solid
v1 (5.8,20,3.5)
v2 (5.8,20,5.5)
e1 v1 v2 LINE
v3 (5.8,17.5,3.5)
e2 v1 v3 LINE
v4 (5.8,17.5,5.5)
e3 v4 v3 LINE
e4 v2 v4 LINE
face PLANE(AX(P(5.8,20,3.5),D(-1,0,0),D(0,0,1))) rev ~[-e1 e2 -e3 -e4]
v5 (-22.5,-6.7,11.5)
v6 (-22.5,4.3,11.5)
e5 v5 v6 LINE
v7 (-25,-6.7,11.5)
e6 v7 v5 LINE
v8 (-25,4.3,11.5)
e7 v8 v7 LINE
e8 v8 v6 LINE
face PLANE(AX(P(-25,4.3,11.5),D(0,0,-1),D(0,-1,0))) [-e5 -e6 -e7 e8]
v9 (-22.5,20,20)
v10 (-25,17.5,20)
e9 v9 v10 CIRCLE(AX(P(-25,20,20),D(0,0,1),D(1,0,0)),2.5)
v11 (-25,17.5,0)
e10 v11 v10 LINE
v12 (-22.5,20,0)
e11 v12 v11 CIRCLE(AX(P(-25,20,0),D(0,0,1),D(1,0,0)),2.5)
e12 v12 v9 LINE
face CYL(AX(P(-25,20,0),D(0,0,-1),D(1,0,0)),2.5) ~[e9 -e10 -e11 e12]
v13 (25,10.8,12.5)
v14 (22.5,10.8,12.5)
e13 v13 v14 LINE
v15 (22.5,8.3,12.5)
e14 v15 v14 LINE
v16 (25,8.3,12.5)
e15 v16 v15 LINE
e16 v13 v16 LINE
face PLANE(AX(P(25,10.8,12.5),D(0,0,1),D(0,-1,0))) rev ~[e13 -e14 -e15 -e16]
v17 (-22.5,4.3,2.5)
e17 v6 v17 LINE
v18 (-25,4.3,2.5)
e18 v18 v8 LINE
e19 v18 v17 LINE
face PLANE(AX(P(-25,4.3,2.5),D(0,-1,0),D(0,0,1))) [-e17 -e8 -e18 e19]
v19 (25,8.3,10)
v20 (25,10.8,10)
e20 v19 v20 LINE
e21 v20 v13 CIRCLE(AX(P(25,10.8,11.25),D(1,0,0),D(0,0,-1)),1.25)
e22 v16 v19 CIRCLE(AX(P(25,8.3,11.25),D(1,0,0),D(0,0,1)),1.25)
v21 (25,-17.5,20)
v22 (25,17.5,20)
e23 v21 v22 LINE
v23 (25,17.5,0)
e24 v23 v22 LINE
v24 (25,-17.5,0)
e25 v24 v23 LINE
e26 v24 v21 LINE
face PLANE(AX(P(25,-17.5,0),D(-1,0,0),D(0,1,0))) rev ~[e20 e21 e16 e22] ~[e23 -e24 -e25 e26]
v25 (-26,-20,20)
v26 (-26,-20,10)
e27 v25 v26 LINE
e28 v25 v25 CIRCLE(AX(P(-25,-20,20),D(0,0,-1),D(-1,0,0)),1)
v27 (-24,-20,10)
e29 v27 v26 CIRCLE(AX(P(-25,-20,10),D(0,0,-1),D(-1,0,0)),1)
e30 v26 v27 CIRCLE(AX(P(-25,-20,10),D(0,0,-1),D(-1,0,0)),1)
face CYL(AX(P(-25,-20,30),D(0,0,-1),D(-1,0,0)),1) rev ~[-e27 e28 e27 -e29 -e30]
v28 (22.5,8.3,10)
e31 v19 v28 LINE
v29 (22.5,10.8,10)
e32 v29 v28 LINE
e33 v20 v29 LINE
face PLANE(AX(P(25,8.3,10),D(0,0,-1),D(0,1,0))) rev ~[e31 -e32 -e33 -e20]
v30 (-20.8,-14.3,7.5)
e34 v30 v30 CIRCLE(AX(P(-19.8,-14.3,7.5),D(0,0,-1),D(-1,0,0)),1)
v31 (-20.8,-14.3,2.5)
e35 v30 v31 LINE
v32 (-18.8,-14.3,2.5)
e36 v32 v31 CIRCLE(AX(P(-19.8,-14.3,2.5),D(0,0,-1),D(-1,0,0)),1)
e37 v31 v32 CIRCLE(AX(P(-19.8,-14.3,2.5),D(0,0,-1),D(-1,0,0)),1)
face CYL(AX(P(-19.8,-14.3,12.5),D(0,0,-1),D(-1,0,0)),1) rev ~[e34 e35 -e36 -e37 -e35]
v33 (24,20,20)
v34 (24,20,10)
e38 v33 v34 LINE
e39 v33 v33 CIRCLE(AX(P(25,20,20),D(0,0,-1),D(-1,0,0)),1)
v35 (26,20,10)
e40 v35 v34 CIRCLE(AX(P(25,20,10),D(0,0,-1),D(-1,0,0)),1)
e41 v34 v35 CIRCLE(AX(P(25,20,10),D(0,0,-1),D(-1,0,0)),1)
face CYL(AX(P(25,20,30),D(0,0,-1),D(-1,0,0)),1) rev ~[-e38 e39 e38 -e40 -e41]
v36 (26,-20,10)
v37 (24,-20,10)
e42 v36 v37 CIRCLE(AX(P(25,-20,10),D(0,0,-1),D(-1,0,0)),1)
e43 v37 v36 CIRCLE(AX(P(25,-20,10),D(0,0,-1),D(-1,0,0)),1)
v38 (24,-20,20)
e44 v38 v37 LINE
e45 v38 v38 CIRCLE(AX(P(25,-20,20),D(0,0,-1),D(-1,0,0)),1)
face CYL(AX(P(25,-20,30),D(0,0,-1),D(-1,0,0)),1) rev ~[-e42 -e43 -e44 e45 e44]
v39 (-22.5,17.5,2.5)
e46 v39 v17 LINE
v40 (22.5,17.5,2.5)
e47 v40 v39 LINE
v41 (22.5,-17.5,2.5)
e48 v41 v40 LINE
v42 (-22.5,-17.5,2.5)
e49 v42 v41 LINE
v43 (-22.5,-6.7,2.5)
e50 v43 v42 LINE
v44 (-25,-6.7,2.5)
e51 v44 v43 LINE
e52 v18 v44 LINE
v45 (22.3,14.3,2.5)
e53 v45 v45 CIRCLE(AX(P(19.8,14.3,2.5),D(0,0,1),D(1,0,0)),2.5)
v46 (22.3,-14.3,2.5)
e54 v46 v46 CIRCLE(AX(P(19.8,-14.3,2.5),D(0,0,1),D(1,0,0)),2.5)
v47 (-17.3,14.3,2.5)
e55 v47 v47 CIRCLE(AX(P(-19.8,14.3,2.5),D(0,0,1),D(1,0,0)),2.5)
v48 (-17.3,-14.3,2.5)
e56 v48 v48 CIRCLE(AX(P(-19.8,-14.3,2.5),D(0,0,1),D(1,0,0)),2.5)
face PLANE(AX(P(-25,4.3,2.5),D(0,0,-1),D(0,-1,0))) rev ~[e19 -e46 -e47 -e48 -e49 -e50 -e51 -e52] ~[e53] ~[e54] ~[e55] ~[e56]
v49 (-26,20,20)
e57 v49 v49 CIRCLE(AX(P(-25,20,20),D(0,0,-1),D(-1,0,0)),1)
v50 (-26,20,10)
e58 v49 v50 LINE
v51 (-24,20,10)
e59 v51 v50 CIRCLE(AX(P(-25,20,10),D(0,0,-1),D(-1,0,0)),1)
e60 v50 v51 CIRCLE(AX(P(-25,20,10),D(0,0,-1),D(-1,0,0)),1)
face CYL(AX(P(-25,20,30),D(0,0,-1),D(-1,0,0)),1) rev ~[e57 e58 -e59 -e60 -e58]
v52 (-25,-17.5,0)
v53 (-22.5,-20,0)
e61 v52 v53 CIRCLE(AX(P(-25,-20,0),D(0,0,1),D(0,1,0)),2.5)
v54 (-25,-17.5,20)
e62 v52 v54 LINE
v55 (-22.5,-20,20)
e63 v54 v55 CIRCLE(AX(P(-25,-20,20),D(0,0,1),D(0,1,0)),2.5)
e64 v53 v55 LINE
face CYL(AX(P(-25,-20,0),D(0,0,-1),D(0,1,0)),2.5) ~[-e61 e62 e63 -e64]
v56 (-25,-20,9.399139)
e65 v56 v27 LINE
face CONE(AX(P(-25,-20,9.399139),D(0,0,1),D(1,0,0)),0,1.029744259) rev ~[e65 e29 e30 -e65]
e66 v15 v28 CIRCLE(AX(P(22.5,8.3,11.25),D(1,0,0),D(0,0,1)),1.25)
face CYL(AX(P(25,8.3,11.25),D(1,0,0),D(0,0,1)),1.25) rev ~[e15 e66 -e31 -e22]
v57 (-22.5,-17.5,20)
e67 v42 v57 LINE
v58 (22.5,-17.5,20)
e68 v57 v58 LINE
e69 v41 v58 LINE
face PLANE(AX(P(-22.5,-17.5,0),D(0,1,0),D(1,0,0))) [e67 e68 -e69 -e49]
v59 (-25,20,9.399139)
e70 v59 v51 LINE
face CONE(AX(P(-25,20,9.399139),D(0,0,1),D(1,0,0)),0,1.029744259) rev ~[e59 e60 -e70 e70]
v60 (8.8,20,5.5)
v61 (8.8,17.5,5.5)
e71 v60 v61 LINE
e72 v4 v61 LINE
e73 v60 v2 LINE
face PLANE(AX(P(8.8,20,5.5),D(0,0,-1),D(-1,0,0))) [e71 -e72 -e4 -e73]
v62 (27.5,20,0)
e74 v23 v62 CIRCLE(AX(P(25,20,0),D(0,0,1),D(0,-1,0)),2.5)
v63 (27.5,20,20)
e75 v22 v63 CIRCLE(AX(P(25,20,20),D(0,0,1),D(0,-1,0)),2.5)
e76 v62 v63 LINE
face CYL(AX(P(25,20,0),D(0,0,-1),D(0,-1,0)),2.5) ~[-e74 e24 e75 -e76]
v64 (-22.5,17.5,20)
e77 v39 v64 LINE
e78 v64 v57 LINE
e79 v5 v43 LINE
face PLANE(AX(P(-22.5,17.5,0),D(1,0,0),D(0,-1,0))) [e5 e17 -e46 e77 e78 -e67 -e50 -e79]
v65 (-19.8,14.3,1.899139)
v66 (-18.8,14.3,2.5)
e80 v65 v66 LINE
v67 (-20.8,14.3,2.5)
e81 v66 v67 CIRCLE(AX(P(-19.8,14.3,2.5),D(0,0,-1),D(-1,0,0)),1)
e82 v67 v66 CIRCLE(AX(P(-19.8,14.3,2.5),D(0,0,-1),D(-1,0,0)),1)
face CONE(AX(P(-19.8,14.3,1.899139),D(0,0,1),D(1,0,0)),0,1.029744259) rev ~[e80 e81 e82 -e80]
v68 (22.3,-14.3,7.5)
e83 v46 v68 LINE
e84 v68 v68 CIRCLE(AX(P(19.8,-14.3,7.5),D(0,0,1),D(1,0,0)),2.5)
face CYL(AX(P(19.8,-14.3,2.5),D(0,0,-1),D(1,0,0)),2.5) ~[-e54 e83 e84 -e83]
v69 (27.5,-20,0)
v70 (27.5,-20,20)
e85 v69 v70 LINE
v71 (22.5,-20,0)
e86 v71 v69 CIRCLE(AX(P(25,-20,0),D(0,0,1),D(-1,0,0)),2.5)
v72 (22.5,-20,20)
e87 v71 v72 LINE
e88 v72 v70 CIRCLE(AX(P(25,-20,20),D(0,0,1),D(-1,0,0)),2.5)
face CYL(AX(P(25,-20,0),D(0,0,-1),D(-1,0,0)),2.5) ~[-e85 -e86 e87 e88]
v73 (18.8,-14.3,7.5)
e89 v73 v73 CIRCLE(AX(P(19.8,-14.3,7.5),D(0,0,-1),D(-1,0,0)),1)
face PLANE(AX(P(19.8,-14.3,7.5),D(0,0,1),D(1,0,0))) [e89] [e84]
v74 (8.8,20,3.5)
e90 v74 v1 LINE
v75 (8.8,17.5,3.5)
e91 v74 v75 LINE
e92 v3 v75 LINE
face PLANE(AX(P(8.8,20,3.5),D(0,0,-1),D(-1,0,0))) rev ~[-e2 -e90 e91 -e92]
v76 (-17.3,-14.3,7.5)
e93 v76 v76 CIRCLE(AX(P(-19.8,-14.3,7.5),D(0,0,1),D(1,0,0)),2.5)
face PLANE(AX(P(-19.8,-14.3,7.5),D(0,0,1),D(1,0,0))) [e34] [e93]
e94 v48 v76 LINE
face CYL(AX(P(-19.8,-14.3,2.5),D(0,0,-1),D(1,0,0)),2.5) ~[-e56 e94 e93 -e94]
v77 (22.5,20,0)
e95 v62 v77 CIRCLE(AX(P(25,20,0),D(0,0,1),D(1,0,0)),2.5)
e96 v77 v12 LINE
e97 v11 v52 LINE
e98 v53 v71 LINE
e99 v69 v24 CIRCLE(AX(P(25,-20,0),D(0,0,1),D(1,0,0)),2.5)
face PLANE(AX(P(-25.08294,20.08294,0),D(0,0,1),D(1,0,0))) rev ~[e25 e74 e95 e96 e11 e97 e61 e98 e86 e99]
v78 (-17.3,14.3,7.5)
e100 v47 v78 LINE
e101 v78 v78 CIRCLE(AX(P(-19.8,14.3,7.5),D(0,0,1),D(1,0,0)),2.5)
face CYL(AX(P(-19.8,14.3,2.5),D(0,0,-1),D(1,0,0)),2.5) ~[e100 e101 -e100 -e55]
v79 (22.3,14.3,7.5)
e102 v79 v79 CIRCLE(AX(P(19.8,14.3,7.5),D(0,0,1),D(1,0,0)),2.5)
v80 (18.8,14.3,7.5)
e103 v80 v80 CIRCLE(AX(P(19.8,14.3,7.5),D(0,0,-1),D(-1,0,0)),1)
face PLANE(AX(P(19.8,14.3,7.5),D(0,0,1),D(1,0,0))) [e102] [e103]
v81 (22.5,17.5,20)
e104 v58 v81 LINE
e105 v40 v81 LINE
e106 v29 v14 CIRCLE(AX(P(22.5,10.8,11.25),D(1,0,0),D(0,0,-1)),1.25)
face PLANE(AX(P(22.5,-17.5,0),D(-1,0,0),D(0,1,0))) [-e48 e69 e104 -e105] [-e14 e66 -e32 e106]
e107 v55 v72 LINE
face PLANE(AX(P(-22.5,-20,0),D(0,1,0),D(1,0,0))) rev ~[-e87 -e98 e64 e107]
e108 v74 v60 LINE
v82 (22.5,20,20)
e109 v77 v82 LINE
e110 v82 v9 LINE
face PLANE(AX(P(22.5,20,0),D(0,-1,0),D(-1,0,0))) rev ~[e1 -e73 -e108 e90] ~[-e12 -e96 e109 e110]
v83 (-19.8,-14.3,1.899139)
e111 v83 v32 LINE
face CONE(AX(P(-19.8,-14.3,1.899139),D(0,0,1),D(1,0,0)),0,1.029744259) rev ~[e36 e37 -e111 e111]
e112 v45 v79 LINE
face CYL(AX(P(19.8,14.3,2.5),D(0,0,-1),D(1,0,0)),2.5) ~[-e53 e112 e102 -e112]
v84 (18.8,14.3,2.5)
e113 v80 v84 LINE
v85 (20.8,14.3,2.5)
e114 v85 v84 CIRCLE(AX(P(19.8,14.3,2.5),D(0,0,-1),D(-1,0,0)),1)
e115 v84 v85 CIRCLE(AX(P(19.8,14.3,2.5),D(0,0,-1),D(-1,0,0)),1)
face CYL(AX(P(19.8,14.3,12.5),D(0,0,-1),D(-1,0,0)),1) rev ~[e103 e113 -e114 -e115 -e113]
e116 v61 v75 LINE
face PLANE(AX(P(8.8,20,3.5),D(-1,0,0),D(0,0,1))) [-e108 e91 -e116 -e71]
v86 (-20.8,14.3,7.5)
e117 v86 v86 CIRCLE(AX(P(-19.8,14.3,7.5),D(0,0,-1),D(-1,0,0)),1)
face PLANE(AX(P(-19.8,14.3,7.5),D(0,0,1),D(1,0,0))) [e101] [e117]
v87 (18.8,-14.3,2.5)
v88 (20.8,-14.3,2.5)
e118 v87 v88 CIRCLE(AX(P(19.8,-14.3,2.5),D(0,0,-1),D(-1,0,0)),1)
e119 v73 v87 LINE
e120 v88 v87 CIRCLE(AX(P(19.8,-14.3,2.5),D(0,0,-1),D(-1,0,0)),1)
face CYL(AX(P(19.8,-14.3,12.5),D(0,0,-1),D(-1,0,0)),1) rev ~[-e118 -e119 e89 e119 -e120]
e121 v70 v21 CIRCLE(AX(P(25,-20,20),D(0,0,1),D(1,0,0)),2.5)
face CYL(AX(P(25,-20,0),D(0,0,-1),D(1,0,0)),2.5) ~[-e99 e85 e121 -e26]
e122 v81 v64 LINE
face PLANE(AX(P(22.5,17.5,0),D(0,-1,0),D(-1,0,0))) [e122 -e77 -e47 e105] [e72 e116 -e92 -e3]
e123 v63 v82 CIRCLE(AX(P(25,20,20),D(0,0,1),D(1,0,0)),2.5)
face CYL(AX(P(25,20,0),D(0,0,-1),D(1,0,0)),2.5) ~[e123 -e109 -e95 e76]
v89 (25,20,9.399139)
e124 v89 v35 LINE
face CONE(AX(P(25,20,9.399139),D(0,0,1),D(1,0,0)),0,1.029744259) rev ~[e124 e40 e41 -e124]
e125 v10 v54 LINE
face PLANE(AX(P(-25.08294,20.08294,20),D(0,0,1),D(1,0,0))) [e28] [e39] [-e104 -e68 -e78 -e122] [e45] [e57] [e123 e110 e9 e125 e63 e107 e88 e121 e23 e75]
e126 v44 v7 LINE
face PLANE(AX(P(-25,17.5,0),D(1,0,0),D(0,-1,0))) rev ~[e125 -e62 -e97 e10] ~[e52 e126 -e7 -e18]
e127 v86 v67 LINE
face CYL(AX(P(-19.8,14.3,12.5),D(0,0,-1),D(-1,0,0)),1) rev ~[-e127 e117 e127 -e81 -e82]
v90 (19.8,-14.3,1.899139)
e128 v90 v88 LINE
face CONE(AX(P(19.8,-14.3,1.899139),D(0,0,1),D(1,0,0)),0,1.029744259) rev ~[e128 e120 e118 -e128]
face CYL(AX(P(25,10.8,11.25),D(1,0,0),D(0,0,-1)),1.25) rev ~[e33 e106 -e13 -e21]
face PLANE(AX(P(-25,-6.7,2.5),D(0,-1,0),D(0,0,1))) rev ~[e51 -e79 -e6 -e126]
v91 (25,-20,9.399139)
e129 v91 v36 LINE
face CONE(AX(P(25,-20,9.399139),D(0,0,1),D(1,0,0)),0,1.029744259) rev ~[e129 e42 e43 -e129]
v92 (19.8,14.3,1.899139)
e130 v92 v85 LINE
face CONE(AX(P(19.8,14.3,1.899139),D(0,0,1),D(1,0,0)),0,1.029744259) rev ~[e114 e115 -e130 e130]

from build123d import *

# Parameters (mm, degrees)
F1_DEPTH        = 20
F2_T            = 2.5
F2_T3_DEPTH     = 25
F3_R            = 2.5
F4_DEPTH        = 5
F11_W           = 3
F11_H           = 2
F12_DEPTH       = 5
F13_DEPTH       = 5
F14_W           = 11
F14_H           = 9
F15_DEPTH       = 5
F16_D           = 2
F16_DEPTH       = 10
F16_TIP         = 0.600860619
F17_D           = 2
F17_DEPTH       = 5
F17_TIP         = 0.600860619
F17_ON_F7_D     = 2
F17_ON_F7_DEPTH = 5
F17_ON_F7_TIP   = 0.600860619
F17_ON_F6_D     = 2
F17_ON_F6_DEPTH = 5
F17_ON_F6_TIP   = 0.600860619
F17_ON_F8_D     = 2
F17_ON_F8_DEPTH = 5
F17_ON_F8_TIP   = 0.600860619


# Not quite as in the source:
# - a shell that OpenCascade refuses in one call is made with other operations: the cavity is built on its own and cut out


with BuildPart() as f1:
    # F0 (on Top) → F1 (new body)
    with BuildSketch(Plane.XY):
        with BuildLine():
            Line((-25, 17.5), (-25, 20))
            Line((-25, 20), (-22.5, 20))
            ThreePointArc((-22.5, 20), (-26.767766953, 21.767766953), (-25, 17.5))
        make_face()
        with BuildLine():
            Line((-22.5, 20), (-25, 20))
            Line((-25, 20), (-25, 17.5))
            ThreePointArc((-25, 17.5), (-23.232233047, 18.232233047), (-22.5, 20))
        make_face()
        with BuildLine():
            Line((22.5, 20), (-22.5, 20))
            ThreePointArc((-22.5, 20), (-23.232233047, 18.232233047), (-25, 17.5))
            Line((-25, 17.5), (-25, -17.5))
            ThreePointArc((-25, -17.5), (-23.232233047, -18.232233047), (-22.5, -20))
            Line((-22.5, -20), (22.5, -20))
            ThreePointArc((22.5, -20), (23.232233047, -18.232233047), (25, -17.5))
            Line((25, -17.5), (25, 17.5))
            ThreePointArc((25, 17.5), (23.232233047, 18.232233047), (22.5, 20))
        make_face()
        with BuildLine():
            ThreePointArc((27.5, 20), (25, 22.5), (22.5, 20))
            Line((22.5, 20), (25, 20))
            Line((25, 20), (25, 17.5))
            ThreePointArc((25, 17.5), (26.767766953, 18.232233047), (27.5, 20))
        make_face()
        with BuildLine():
            Line((25, 20), (22.5, 20))
            ThreePointArc((22.5, 20), (23.232233047, 18.232233047), (25, 17.5))
            Line((25, 17.5), (25, 20))
        make_face()
        with BuildLine():
            ThreePointArc((-22.5, -20), (-23.232233047, -18.232233047), (-25, -17.5))
            Line((-25, -17.5), (-25, -20))
            Line((-25, -20), (-22.5, -20))
        make_face()
        with BuildLine():
            Line((-25, -20), (-25, -17.5))
            ThreePointArc((-25, -17.5), (-26.767766953, -21.767766953), (-22.5, -20))
            Line((-22.5, -20), (-25, -20))
        make_face()
        with BuildLine():
            ThreePointArc((27.5, -20), (26.767766953, -18.232233047), (25, -17.5))
            Line((25, -17.5), (25, -20))
            Line((25, -20), (22.5, -20))
            ThreePointArc((22.5, -20), (25, -22.5), (27.5, -20))
        make_face()
        with BuildLine():
            Line((25, -20), (25, -17.5))
            ThreePointArc((25, -17.5), (23.232233047, -18.232233047), (22.5, -20))
            Line((22.5, -20), (25, -20))
        make_face()
    extrude(amount=F1_DEPTH)

    # F2: shell of thickness 2.5, made by hand


with BuildPart() as f2_core1:
    # F2_t2: copy of F1
    add(f1.part)

    # the walls: a layer under each face that stays
    f2_faces = [f2_core1.faces().sort_by_distance(p)[0] for p in [
        (-25, 0, 10),
        (0, -20, 10),
        (25, 0, 10),
        (0, 20, 10),
        (0, 0, 0),
    ]]
    thicken(f2_faces, amount=-F2_T, mode=Mode.SUBTRACT)

    # F2_s4 → F2_t3 (cut)
    with BuildSketch(Plane.XY.offset(-2.5)):
        Polygon((-22.475, 20.025), (-25, 20), (-25, 17.5), (-22.5, 17.5), align=None)
        Polygon((-25.025, 17.475), (-25, 20), (-22.5, 20), (-22.5, 17.5), align=None)
        Polygon((-25.025, -17.475), (-22.5, -17.5), (-22.5, -20), (-25, -20), align=None)
        Polygon((-22.475, -20.025), (-25, -20), (-25, -17.5), (-22.5, -17.5), align=None)
        Polygon((22.475, -20.025), (22.5, -17.5), (25, -17.5), (25, -20), align=None)
        Polygon((25.025, -17.475), (25, -20), (22.5, -20), (22.5, -17.5), align=None)
        Polygon((25.025, 17.475), (22.5, 17.5), (22.5, 20), (25, 20), align=None)
        Polygon((22.475, 20.025), (25, 20), (25, 17.5), (22.5, 17.5), align=None)
    extrude(amount=F2_T3_DEPTH, mode=Mode.SUBTRACT)


with BuildPart() as f1_1:
    add(f1.part)

    # what is left inside the walls is the cavity
    f2_cavity = [f2_core1.part.solids().sort_by_distance(p)[0] for p in [
        (0, -5.833333, 2.525),
    ]]
    add(f2_cavity, mode=Mode.SUBTRACT)

    # F3 (on face) → F4 (join)
    with BuildSketch(Plane.XY.offset(2.5)):
        with Locations((-19.8, 14.3)):
            Circle(F3_R)
        with Locations((19.8, 14.3)):
            Circle(F3_R)
        with Locations((-19.8, -14.3)):
            Circle(F3_R)
        with Locations((19.8, -14.3)):
            Circle(F3_R)
    extrude(amount=F4_DEPTH)

    # F11 (on face) → F12 (cut)
    with BuildSketch(Plane(origin=(0, 20, 0), x_dir=(-1, 0, 0), z_dir=(0, 1, 0))):
        with Locations((-7.3, 4.5)):
            Rectangle(F11_W, F11_H)
    extrude(amount=-F12_DEPTH, mode=Mode.SUBTRACT)

    # F10 (on face) → F13 (cut)
    with BuildSketch(Plane.YZ.offset(25)):
        with BuildLine():
            Line((10.8, 12.5), (8.3, 12.5))
            ThreePointArc((8.3, 12.5), (7.05, 11.25), (8.3, 10))
            Line((8.3, 10), (10.8, 10))
            ThreePointArc((10.8, 10), (12.05, 11.25), (10.8, 12.5))
        make_face()
    extrude(amount=-F13_DEPTH, mode=Mode.SUBTRACT)

    # F14 (on face) → F15 (cut)
    with BuildSketch(Plane(origin=(-25, 0, 0), x_dir=(0, -1, 0), z_dir=(-1, 0, 0))):
        with Locations((1.2, 7)):
            Rectangle(F14_W, F14_H)
    extrude(amount=-F15_DEPTH, mode=Mode.SUBTRACT)

    # F16
    with Locations(Plane.XY.offset(20)):
        with Locations((-25, 20), (25, 20), (-25, -20), (25, -20)):
            Hole(F16_D / 2, depth=F16_DEPTH)
            with Locations((0, 0, -(F16_DEPTH + F16_TIP / 2))):  # 118° drill point
                Cone(0, F16_D / 2, F16_TIP, mode=Mode.SUBTRACT)

    # F17
    with Locations(Plane.XY.offset(7.5)):
        with Locations((-19.8, 14.3)):
            Hole(F17_D / 2, depth=F17_DEPTH)
            with Locations((0, 0, -(F17_DEPTH + F17_TIP / 2))):  # 118° drill point
                Cone(0, F17_D / 2, F17_TIP, mode=Mode.SUBTRACT)

    # F17 on F7
    with Locations(Plane.XY.offset(7.5)):
        with Locations((19.8, 14.3)):
            Hole(F17_ON_F7_D / 2, depth=F17_ON_F7_DEPTH)
            with Locations((0, 0, -(F17_ON_F7_DEPTH + F17_ON_F7_TIP / 2))):  # 118° drill point
                Cone(0, F17_ON_F7_D / 2, F17_ON_F7_TIP, mode=Mode.SUBTRACT)

    # F17 on F6
    with Locations(Plane.XY.offset(7.5)):
        with Locations((-19.8, -14.3)):
            Hole(F17_ON_F6_D / 2, depth=F17_ON_F6_DEPTH)
            with Locations((0, 0, -(F17_ON_F6_DEPTH + F17_ON_F6_TIP / 2))):  # 118° drill point
                Cone(0, F17_ON_F6_D / 2, F17_ON_F6_TIP, mode=Mode.SUBTRACT)

    # F17 on F8
    with Locations(Plane.XY.offset(7.5)):
        with Locations((19.8, -14.3)):
            Hole(F17_ON_F8_D / 2, depth=F17_ON_F8_DEPTH)
            with Locations((0, 0, -(F17_ON_F8_DEPTH + F17_ON_F8_TIP / 2))):  # 118° drill point
                Cone(0, F17_ON_F8_D / 2, F17_ON_F8_TIP, mode=Mode.SUBTRACT)


solid = f1_1.part
